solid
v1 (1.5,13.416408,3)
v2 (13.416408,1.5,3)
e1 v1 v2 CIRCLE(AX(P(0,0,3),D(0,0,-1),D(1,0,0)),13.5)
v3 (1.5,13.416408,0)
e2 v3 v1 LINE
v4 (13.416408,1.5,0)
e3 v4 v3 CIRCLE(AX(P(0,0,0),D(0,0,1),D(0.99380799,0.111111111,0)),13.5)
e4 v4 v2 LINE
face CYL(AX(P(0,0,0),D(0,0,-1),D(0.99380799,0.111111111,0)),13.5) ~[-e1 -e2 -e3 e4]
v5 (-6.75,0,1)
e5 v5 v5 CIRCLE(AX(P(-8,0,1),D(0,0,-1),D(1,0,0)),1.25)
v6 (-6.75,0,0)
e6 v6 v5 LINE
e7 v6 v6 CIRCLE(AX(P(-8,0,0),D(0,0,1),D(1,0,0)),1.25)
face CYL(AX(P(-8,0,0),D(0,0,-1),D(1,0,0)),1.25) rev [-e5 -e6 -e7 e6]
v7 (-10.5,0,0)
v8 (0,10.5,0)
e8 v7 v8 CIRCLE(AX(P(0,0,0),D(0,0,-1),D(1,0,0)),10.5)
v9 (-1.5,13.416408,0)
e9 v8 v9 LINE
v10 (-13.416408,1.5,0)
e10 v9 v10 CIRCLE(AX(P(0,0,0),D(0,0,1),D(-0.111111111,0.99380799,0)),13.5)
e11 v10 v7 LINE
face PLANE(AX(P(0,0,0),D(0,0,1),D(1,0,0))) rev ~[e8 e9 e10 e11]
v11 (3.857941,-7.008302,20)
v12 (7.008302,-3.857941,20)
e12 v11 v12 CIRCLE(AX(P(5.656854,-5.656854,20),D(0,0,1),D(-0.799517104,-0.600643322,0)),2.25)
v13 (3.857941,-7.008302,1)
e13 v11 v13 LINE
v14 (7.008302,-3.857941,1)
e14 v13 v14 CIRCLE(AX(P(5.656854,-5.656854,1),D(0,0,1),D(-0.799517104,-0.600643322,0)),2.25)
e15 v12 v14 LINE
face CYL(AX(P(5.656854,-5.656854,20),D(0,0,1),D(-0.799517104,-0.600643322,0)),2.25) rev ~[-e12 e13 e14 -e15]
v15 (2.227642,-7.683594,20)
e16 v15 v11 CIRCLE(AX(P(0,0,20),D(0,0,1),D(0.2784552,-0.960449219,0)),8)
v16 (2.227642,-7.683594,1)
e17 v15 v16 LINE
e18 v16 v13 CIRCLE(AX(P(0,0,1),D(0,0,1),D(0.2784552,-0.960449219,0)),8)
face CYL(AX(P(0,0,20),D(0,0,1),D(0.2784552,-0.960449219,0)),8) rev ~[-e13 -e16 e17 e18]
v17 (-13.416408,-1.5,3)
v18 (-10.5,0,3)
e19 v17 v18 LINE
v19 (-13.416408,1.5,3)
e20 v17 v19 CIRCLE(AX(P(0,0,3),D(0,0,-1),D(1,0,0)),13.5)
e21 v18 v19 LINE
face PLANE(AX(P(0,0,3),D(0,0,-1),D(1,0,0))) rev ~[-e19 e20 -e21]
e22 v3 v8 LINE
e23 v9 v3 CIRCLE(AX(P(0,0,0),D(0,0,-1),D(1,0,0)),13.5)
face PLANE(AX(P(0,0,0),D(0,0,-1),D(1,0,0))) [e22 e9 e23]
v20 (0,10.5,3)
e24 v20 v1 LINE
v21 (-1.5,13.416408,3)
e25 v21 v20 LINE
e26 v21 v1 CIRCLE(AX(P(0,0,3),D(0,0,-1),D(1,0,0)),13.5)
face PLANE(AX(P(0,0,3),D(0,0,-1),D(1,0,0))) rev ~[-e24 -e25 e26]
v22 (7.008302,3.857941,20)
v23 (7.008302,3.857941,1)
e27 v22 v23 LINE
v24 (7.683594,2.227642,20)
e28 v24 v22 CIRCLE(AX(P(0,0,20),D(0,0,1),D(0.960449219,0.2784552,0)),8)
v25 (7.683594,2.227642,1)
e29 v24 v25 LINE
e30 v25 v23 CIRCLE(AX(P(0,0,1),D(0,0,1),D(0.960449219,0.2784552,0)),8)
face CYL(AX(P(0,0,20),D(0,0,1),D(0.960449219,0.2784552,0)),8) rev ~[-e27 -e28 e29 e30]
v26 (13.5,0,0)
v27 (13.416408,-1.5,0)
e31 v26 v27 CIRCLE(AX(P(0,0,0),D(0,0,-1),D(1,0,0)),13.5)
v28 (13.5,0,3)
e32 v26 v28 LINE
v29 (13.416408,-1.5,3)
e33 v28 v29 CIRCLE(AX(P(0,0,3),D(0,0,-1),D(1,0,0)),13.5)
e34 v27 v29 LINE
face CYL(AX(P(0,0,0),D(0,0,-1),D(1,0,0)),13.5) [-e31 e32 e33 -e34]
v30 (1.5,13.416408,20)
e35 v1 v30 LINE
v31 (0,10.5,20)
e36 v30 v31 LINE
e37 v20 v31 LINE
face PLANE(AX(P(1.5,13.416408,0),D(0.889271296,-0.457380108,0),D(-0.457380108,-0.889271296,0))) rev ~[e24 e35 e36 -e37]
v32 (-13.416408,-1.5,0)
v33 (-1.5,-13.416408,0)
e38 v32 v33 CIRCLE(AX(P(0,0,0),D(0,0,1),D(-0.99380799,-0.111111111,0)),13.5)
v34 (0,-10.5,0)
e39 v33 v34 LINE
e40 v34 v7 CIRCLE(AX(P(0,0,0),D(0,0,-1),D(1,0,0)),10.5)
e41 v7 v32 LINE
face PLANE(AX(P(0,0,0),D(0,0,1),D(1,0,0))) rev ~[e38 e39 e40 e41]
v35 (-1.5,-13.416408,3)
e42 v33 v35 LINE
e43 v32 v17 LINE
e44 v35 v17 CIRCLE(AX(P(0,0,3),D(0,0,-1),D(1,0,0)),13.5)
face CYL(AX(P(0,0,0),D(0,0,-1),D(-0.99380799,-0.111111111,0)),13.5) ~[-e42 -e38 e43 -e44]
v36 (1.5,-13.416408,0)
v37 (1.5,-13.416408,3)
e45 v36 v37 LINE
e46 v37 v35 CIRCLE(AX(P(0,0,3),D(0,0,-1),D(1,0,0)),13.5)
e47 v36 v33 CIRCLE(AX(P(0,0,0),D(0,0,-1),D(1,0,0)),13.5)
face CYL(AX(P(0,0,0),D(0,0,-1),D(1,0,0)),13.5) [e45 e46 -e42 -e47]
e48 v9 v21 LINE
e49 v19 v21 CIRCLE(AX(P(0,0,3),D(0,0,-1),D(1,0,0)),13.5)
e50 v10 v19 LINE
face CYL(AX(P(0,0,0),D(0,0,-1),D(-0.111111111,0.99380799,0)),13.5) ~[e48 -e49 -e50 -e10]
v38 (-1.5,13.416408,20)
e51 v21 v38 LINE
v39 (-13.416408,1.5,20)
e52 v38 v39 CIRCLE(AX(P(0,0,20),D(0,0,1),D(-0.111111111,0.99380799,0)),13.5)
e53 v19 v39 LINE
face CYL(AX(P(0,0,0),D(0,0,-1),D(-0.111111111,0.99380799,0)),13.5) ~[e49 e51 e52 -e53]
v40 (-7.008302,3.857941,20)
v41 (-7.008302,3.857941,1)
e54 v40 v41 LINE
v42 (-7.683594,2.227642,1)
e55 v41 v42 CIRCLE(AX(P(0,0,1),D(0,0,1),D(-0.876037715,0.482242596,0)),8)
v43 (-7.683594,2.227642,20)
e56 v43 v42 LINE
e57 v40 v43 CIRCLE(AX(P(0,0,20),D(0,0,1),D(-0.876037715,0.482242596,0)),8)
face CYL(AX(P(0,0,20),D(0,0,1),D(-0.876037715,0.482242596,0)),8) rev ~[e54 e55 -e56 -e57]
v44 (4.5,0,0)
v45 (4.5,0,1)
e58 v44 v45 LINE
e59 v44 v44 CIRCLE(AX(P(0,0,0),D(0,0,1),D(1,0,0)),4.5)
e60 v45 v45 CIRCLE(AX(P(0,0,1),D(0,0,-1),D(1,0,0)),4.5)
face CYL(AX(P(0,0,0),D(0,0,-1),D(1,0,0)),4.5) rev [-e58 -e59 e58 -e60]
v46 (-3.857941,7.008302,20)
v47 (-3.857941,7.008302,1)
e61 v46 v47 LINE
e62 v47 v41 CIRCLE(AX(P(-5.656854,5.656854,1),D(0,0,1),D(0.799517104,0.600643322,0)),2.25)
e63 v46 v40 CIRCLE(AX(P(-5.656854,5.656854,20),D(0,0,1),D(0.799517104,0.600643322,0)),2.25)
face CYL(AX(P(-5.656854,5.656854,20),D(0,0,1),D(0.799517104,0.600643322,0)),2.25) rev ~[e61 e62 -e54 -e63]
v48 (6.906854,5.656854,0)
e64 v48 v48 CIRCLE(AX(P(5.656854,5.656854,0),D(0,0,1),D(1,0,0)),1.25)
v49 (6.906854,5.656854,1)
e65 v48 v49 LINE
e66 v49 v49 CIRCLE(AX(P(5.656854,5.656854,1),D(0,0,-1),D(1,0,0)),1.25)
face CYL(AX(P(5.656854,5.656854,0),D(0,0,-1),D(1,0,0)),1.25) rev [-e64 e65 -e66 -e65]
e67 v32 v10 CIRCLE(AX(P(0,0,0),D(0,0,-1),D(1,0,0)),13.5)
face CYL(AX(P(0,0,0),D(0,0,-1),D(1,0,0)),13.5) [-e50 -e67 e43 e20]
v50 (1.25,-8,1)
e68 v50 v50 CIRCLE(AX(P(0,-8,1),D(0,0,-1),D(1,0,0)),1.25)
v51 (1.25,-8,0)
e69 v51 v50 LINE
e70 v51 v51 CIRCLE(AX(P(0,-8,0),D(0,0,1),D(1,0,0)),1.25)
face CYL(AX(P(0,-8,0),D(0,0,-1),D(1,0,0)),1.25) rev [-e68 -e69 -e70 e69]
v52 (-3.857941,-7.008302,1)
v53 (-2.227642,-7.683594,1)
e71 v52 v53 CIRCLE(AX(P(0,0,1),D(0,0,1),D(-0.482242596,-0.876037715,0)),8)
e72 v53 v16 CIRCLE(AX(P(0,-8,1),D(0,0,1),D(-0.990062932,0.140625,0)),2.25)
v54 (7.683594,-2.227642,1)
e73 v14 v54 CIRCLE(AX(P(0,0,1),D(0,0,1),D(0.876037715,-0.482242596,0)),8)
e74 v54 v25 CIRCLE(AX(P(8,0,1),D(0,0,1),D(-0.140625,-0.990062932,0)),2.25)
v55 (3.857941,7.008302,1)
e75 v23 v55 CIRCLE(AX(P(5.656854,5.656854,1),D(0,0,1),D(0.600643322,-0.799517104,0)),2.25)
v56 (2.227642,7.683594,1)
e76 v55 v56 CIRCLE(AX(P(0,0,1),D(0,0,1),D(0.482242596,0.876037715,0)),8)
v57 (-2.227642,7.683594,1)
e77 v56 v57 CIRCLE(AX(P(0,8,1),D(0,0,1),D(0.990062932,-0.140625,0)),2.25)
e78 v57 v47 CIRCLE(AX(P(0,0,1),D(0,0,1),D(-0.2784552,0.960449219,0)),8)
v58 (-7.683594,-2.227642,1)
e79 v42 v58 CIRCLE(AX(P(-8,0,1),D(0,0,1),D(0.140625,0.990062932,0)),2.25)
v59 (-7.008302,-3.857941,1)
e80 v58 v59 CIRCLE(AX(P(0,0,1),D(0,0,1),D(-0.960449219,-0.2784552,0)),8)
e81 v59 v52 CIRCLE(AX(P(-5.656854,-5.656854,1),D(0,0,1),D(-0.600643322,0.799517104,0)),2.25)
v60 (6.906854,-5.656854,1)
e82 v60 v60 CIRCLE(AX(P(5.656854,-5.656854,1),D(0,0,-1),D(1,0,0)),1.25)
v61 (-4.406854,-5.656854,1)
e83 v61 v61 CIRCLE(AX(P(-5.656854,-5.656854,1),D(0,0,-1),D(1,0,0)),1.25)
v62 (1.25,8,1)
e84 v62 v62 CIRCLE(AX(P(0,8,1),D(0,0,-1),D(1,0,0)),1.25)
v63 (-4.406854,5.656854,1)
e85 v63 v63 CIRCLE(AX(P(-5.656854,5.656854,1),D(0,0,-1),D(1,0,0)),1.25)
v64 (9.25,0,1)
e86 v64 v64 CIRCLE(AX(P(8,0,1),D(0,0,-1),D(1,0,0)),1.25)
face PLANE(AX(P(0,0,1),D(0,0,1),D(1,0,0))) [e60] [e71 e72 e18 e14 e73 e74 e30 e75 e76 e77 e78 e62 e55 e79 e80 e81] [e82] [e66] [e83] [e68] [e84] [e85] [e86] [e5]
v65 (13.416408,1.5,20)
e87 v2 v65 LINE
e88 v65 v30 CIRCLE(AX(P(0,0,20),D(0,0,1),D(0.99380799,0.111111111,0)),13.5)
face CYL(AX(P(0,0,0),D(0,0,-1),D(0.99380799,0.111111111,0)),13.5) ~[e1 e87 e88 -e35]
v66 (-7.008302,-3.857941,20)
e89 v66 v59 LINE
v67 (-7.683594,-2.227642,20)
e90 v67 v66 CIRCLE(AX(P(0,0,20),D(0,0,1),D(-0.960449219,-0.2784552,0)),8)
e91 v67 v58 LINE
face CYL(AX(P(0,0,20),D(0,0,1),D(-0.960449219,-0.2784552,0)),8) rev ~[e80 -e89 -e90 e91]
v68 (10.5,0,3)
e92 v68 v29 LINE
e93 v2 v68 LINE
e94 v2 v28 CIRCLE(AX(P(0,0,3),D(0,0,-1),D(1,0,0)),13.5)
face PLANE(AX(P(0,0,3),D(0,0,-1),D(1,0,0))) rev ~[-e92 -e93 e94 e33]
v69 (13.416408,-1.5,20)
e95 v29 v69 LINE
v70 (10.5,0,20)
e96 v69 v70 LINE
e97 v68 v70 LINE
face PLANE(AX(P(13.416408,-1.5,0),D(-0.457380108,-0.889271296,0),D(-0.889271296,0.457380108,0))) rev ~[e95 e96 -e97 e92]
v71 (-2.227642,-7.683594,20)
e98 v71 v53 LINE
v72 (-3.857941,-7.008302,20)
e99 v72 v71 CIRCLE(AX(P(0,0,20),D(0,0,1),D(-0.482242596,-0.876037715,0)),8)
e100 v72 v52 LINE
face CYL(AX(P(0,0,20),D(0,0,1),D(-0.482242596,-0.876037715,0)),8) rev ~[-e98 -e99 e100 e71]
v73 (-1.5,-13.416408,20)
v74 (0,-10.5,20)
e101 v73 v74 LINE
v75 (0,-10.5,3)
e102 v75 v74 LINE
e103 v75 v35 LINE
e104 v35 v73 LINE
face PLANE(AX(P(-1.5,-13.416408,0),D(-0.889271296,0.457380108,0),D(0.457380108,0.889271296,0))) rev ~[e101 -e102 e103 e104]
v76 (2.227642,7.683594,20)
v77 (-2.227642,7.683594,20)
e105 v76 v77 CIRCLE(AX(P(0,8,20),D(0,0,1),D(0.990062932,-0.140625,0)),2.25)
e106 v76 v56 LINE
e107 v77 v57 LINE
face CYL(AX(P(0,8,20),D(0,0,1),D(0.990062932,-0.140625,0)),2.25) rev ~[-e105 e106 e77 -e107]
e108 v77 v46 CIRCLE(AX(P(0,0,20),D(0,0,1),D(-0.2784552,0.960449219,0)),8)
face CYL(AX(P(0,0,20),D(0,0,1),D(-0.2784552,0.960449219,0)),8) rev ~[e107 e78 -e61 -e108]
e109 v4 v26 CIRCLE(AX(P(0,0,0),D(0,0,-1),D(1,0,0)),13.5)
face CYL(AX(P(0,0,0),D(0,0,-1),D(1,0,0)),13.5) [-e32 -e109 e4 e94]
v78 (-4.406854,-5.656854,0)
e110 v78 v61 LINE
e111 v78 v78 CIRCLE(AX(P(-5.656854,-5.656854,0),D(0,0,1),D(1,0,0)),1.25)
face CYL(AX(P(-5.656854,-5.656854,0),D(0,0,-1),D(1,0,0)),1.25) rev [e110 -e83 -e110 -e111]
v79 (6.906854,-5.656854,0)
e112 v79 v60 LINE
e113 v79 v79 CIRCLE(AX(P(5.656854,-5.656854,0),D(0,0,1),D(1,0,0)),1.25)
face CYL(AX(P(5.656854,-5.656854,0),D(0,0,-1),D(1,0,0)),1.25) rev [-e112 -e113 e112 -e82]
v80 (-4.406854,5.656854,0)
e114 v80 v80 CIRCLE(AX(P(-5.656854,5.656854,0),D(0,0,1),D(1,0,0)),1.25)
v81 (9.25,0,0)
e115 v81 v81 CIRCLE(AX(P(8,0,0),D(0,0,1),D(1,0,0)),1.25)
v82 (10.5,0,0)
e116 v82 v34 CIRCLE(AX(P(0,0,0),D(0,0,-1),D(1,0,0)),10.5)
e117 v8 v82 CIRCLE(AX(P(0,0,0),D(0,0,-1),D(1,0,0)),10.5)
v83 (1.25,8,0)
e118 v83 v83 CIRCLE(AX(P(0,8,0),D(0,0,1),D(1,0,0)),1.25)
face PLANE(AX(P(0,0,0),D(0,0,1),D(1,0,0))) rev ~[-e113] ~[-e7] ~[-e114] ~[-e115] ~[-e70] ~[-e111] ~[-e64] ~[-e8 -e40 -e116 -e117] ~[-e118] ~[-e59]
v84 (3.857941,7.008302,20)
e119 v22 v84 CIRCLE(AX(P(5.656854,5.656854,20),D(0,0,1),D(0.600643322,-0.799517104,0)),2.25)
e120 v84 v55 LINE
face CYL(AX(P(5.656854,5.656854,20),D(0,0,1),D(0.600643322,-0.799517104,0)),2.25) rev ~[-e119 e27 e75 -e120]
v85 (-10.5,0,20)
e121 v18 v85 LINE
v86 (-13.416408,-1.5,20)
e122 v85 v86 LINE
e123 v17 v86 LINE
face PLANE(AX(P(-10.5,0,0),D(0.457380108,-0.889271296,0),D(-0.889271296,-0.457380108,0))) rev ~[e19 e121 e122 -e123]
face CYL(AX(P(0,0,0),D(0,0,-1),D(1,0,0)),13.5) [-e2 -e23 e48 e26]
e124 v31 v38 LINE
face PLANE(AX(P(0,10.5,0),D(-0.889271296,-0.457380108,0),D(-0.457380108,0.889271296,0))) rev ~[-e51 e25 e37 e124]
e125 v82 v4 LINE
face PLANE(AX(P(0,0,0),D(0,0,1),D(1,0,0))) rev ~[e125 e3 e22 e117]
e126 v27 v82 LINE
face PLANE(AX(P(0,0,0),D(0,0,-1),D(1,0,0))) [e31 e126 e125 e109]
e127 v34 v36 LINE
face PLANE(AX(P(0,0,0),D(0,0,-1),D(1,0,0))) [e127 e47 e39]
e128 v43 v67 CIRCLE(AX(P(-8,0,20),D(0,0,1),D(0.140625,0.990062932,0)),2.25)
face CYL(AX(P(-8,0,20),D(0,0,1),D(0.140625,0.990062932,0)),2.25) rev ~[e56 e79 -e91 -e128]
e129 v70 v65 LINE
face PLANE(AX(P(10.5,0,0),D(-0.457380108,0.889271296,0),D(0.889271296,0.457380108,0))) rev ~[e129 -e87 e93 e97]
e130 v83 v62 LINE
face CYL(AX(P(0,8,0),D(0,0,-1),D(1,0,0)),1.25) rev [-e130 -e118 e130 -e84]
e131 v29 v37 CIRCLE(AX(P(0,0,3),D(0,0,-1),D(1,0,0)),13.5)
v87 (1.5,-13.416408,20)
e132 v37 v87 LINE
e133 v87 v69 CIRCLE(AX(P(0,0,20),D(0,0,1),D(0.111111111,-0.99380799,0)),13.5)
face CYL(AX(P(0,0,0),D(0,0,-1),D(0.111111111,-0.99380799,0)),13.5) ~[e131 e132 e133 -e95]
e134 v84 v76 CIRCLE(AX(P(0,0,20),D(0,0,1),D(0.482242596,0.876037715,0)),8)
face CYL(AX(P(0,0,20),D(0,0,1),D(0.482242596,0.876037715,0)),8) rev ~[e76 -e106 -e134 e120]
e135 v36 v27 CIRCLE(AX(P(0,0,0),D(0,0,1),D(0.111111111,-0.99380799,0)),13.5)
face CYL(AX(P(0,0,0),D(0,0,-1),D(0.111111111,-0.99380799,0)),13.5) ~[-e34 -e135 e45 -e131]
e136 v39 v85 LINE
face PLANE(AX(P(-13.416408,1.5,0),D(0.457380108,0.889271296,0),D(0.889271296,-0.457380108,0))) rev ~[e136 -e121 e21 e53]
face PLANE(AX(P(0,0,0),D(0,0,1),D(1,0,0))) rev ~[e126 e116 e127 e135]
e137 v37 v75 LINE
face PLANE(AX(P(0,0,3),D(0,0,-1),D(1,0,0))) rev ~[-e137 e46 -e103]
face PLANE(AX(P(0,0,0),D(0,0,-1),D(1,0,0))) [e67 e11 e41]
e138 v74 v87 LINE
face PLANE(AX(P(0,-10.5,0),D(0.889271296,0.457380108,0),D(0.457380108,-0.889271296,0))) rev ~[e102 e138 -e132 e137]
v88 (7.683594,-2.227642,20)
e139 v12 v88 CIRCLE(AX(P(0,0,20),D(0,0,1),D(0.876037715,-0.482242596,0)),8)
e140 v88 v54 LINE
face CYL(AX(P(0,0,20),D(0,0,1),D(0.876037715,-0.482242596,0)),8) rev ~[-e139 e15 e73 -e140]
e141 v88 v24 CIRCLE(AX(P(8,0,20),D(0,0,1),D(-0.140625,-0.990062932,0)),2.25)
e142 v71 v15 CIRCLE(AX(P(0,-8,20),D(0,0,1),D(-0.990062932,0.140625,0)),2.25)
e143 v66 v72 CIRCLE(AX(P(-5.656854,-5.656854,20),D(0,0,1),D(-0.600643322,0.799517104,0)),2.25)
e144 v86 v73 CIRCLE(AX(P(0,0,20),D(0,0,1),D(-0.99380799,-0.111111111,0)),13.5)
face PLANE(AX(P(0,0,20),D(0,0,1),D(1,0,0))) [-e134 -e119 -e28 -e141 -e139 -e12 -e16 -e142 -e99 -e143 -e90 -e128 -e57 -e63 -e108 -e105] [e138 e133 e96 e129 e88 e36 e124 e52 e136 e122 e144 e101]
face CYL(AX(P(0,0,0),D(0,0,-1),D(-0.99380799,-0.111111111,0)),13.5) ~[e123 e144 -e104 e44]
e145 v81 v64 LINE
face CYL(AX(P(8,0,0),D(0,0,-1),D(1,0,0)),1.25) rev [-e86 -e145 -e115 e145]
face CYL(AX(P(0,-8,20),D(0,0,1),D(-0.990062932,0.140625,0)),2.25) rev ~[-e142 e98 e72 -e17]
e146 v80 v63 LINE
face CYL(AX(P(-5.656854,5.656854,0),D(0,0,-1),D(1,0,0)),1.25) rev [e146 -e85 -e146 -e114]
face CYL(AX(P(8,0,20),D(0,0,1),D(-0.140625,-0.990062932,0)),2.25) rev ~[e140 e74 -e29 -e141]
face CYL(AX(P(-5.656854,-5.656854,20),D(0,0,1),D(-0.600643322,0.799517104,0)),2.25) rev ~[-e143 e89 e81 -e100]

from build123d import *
from build123d import SkipClean  # not in build123d's __all__

# Parameters (mm, degrees)
F0_R     = 1.25
F0_R_2   = 4.5
F1_DEPTH = 20
F3_DEPTH = 19
F4_R     = 13.5
F4_R_2   = 10.5
F5_DEPTH = 3


with BuildPart() as f1:
    # F0 (on Top) → F1 (new body)
    with BuildSketch(Plane.XY):
        with BuildLine():
            Line((-10.5, 0), (-13.416407865, -1.5))
            ThreePointArc((-13.416407865, -1.5), (-9.545941546, -9.545941546), (-1.5, -13.416407865))
            Line((-1.5, -13.416407865), (0, -10.5))
            Line((0, -10.5), (1.5, -13.416407865))
            ThreePointArc((1.5, -13.416407865), (9.545941546, -9.545941546), (13.416407865, -1.5))
            Line((13.416407865, -1.5), (10.5, 0))
            Line((10.5, 0), (13.416407865, 1.5))
            ThreePointArc((13.416407865, 1.5), (9.545941546, 9.545941546), (1.5, 13.416407865))
            Line((1.5, 13.416407865), (0, 10.5))
            Line((0, 10.5), (-1.5, 13.416407865))
            ThreePointArc((-1.5, 13.416407865), (-9.545941546, 9.545941546), (-13.416407865, 1.5))
            Line((-13.416407865, 1.5), (-10.5, 0))
        make_face()
        with Locations((-5.6568542495, -5.6568542495)):
            Circle(F0_R, mode=Mode.SUBTRACT)
        with Locations((0, -8)):
            Circle(F0_R, mode=Mode.SUBTRACT)
        with Locations((5.6568542495, -5.6568542495)):
            Circle(F0_R, mode=Mode.SUBTRACT)
        with Locations((-8, 0)):
            Circle(F0_R, mode=Mode.SUBTRACT)
        with Locations((-5.6568542495, 5.6568542495)):
            Circle(F0_R, mode=Mode.SUBTRACT)
        Circle(F0_R_2, mode=Mode.SUBTRACT)
        with Locations((5.6568542495, 5.6568542495)):
            Circle(F0_R, mode=Mode.SUBTRACT)
        with Locations((8, 0)):
            Circle(F0_R, mode=Mode.SUBTRACT)
        with Locations((0, 8)):
            Circle(F0_R, mode=Mode.SUBTRACT)
    extrude(amount=F1_DEPTH)

    # F2 (on face) → F3 (cut)
    with BuildSketch(Plane.XY.offset(20)):
        with BuildLine():
            ThreePointArc((-7.0083017238, 3.8579407652), (-7.3910362601, 3.0614674589), (-7.68359375, 2.2276415971))
            ThreePointArc((-7.68359375, 2.2276415971), (-10.25, 0), (-7.68359375, -2.2276415971))
            ThreePointArc((-7.68359375, -2.2276415971), (-7.3910362601, -3.0614674589), (-7.0083017238, -3.8579407652))
            ThreePointArc((-7.0083017238, -3.8579407652), (-7.2478445072, -7.2478445072), (-3.8579407652, -7.0083017238))
            ThreePointArc((-3.8579407652, -7.0083017238), (-3.0614674589, -7.3910362601), (-2.2276415971, -7.68359375))
            ThreePointArc((-2.2276415971, -7.68359375), (0, -10.25), (2.2276415971, -7.68359375))
            ThreePointArc((2.2276415971, -7.68359375), (3.0614674589, -7.3910362601), (3.8579407652, -7.0083017238))
            ThreePointArc((3.8579407652, -7.0083017238), (7.2478445072, -7.2478445072), (7.0083017238, -3.8579407652))
            ThreePointArc((7.0083017238, -3.8579407652), (7.3910362601, -3.0614674589), (7.68359375, -2.2276415971))
            ThreePointArc((7.68359375, -2.2276415971), (10.25, 0), (7.68359375, 2.2276415971))
            ThreePointArc((7.68359375, 2.2276415971), (7.3910362601, 3.0614674589), (7.0083017238, 3.8579407652))
            ThreePointArc((7.0083017238, 3.8579407652), (7.2478445072, 7.2478445072), (3.8579407652, 7.0083017238))
            ThreePointArc((3.8579407652, 7.0083017238), (3.0614674589, 7.3910362601), (2.2276415971, 7.68359375))
            ThreePointArc((2.2276415971, 7.68359375), (0, 10.25), (-2.2276415971, 7.68359375))
            ThreePointArc((-2.2276415971, 7.68359375), (-3.0614674589, 7.3910362601), (-3.8579407652, 7.0083017238))
            ThreePointArc((-3.8579407652, 7.0083017238), (-7.2478445072, 7.2478445072), (-7.0083017238, 3.8579407652))
        make_face()
    extrude(amount=-F3_DEPTH, mode=Mode.SUBTRACT)

    # F4 (on face) → F5 (join)
    with BuildSketch(Plane(origin=(0, 0, 0), x_dir=(1, 0, 0), z_dir=(0, 0, -1))):
        Circle(F4_R)
        Circle(F4_R_2, mode=Mode.SUBTRACT)
    with SkipClean():  # cleaning this boolean's faces spoils the solid; the shape is the same uncleaned
        extrude(amount=-F5_DEPTH)


solid = f1.part
